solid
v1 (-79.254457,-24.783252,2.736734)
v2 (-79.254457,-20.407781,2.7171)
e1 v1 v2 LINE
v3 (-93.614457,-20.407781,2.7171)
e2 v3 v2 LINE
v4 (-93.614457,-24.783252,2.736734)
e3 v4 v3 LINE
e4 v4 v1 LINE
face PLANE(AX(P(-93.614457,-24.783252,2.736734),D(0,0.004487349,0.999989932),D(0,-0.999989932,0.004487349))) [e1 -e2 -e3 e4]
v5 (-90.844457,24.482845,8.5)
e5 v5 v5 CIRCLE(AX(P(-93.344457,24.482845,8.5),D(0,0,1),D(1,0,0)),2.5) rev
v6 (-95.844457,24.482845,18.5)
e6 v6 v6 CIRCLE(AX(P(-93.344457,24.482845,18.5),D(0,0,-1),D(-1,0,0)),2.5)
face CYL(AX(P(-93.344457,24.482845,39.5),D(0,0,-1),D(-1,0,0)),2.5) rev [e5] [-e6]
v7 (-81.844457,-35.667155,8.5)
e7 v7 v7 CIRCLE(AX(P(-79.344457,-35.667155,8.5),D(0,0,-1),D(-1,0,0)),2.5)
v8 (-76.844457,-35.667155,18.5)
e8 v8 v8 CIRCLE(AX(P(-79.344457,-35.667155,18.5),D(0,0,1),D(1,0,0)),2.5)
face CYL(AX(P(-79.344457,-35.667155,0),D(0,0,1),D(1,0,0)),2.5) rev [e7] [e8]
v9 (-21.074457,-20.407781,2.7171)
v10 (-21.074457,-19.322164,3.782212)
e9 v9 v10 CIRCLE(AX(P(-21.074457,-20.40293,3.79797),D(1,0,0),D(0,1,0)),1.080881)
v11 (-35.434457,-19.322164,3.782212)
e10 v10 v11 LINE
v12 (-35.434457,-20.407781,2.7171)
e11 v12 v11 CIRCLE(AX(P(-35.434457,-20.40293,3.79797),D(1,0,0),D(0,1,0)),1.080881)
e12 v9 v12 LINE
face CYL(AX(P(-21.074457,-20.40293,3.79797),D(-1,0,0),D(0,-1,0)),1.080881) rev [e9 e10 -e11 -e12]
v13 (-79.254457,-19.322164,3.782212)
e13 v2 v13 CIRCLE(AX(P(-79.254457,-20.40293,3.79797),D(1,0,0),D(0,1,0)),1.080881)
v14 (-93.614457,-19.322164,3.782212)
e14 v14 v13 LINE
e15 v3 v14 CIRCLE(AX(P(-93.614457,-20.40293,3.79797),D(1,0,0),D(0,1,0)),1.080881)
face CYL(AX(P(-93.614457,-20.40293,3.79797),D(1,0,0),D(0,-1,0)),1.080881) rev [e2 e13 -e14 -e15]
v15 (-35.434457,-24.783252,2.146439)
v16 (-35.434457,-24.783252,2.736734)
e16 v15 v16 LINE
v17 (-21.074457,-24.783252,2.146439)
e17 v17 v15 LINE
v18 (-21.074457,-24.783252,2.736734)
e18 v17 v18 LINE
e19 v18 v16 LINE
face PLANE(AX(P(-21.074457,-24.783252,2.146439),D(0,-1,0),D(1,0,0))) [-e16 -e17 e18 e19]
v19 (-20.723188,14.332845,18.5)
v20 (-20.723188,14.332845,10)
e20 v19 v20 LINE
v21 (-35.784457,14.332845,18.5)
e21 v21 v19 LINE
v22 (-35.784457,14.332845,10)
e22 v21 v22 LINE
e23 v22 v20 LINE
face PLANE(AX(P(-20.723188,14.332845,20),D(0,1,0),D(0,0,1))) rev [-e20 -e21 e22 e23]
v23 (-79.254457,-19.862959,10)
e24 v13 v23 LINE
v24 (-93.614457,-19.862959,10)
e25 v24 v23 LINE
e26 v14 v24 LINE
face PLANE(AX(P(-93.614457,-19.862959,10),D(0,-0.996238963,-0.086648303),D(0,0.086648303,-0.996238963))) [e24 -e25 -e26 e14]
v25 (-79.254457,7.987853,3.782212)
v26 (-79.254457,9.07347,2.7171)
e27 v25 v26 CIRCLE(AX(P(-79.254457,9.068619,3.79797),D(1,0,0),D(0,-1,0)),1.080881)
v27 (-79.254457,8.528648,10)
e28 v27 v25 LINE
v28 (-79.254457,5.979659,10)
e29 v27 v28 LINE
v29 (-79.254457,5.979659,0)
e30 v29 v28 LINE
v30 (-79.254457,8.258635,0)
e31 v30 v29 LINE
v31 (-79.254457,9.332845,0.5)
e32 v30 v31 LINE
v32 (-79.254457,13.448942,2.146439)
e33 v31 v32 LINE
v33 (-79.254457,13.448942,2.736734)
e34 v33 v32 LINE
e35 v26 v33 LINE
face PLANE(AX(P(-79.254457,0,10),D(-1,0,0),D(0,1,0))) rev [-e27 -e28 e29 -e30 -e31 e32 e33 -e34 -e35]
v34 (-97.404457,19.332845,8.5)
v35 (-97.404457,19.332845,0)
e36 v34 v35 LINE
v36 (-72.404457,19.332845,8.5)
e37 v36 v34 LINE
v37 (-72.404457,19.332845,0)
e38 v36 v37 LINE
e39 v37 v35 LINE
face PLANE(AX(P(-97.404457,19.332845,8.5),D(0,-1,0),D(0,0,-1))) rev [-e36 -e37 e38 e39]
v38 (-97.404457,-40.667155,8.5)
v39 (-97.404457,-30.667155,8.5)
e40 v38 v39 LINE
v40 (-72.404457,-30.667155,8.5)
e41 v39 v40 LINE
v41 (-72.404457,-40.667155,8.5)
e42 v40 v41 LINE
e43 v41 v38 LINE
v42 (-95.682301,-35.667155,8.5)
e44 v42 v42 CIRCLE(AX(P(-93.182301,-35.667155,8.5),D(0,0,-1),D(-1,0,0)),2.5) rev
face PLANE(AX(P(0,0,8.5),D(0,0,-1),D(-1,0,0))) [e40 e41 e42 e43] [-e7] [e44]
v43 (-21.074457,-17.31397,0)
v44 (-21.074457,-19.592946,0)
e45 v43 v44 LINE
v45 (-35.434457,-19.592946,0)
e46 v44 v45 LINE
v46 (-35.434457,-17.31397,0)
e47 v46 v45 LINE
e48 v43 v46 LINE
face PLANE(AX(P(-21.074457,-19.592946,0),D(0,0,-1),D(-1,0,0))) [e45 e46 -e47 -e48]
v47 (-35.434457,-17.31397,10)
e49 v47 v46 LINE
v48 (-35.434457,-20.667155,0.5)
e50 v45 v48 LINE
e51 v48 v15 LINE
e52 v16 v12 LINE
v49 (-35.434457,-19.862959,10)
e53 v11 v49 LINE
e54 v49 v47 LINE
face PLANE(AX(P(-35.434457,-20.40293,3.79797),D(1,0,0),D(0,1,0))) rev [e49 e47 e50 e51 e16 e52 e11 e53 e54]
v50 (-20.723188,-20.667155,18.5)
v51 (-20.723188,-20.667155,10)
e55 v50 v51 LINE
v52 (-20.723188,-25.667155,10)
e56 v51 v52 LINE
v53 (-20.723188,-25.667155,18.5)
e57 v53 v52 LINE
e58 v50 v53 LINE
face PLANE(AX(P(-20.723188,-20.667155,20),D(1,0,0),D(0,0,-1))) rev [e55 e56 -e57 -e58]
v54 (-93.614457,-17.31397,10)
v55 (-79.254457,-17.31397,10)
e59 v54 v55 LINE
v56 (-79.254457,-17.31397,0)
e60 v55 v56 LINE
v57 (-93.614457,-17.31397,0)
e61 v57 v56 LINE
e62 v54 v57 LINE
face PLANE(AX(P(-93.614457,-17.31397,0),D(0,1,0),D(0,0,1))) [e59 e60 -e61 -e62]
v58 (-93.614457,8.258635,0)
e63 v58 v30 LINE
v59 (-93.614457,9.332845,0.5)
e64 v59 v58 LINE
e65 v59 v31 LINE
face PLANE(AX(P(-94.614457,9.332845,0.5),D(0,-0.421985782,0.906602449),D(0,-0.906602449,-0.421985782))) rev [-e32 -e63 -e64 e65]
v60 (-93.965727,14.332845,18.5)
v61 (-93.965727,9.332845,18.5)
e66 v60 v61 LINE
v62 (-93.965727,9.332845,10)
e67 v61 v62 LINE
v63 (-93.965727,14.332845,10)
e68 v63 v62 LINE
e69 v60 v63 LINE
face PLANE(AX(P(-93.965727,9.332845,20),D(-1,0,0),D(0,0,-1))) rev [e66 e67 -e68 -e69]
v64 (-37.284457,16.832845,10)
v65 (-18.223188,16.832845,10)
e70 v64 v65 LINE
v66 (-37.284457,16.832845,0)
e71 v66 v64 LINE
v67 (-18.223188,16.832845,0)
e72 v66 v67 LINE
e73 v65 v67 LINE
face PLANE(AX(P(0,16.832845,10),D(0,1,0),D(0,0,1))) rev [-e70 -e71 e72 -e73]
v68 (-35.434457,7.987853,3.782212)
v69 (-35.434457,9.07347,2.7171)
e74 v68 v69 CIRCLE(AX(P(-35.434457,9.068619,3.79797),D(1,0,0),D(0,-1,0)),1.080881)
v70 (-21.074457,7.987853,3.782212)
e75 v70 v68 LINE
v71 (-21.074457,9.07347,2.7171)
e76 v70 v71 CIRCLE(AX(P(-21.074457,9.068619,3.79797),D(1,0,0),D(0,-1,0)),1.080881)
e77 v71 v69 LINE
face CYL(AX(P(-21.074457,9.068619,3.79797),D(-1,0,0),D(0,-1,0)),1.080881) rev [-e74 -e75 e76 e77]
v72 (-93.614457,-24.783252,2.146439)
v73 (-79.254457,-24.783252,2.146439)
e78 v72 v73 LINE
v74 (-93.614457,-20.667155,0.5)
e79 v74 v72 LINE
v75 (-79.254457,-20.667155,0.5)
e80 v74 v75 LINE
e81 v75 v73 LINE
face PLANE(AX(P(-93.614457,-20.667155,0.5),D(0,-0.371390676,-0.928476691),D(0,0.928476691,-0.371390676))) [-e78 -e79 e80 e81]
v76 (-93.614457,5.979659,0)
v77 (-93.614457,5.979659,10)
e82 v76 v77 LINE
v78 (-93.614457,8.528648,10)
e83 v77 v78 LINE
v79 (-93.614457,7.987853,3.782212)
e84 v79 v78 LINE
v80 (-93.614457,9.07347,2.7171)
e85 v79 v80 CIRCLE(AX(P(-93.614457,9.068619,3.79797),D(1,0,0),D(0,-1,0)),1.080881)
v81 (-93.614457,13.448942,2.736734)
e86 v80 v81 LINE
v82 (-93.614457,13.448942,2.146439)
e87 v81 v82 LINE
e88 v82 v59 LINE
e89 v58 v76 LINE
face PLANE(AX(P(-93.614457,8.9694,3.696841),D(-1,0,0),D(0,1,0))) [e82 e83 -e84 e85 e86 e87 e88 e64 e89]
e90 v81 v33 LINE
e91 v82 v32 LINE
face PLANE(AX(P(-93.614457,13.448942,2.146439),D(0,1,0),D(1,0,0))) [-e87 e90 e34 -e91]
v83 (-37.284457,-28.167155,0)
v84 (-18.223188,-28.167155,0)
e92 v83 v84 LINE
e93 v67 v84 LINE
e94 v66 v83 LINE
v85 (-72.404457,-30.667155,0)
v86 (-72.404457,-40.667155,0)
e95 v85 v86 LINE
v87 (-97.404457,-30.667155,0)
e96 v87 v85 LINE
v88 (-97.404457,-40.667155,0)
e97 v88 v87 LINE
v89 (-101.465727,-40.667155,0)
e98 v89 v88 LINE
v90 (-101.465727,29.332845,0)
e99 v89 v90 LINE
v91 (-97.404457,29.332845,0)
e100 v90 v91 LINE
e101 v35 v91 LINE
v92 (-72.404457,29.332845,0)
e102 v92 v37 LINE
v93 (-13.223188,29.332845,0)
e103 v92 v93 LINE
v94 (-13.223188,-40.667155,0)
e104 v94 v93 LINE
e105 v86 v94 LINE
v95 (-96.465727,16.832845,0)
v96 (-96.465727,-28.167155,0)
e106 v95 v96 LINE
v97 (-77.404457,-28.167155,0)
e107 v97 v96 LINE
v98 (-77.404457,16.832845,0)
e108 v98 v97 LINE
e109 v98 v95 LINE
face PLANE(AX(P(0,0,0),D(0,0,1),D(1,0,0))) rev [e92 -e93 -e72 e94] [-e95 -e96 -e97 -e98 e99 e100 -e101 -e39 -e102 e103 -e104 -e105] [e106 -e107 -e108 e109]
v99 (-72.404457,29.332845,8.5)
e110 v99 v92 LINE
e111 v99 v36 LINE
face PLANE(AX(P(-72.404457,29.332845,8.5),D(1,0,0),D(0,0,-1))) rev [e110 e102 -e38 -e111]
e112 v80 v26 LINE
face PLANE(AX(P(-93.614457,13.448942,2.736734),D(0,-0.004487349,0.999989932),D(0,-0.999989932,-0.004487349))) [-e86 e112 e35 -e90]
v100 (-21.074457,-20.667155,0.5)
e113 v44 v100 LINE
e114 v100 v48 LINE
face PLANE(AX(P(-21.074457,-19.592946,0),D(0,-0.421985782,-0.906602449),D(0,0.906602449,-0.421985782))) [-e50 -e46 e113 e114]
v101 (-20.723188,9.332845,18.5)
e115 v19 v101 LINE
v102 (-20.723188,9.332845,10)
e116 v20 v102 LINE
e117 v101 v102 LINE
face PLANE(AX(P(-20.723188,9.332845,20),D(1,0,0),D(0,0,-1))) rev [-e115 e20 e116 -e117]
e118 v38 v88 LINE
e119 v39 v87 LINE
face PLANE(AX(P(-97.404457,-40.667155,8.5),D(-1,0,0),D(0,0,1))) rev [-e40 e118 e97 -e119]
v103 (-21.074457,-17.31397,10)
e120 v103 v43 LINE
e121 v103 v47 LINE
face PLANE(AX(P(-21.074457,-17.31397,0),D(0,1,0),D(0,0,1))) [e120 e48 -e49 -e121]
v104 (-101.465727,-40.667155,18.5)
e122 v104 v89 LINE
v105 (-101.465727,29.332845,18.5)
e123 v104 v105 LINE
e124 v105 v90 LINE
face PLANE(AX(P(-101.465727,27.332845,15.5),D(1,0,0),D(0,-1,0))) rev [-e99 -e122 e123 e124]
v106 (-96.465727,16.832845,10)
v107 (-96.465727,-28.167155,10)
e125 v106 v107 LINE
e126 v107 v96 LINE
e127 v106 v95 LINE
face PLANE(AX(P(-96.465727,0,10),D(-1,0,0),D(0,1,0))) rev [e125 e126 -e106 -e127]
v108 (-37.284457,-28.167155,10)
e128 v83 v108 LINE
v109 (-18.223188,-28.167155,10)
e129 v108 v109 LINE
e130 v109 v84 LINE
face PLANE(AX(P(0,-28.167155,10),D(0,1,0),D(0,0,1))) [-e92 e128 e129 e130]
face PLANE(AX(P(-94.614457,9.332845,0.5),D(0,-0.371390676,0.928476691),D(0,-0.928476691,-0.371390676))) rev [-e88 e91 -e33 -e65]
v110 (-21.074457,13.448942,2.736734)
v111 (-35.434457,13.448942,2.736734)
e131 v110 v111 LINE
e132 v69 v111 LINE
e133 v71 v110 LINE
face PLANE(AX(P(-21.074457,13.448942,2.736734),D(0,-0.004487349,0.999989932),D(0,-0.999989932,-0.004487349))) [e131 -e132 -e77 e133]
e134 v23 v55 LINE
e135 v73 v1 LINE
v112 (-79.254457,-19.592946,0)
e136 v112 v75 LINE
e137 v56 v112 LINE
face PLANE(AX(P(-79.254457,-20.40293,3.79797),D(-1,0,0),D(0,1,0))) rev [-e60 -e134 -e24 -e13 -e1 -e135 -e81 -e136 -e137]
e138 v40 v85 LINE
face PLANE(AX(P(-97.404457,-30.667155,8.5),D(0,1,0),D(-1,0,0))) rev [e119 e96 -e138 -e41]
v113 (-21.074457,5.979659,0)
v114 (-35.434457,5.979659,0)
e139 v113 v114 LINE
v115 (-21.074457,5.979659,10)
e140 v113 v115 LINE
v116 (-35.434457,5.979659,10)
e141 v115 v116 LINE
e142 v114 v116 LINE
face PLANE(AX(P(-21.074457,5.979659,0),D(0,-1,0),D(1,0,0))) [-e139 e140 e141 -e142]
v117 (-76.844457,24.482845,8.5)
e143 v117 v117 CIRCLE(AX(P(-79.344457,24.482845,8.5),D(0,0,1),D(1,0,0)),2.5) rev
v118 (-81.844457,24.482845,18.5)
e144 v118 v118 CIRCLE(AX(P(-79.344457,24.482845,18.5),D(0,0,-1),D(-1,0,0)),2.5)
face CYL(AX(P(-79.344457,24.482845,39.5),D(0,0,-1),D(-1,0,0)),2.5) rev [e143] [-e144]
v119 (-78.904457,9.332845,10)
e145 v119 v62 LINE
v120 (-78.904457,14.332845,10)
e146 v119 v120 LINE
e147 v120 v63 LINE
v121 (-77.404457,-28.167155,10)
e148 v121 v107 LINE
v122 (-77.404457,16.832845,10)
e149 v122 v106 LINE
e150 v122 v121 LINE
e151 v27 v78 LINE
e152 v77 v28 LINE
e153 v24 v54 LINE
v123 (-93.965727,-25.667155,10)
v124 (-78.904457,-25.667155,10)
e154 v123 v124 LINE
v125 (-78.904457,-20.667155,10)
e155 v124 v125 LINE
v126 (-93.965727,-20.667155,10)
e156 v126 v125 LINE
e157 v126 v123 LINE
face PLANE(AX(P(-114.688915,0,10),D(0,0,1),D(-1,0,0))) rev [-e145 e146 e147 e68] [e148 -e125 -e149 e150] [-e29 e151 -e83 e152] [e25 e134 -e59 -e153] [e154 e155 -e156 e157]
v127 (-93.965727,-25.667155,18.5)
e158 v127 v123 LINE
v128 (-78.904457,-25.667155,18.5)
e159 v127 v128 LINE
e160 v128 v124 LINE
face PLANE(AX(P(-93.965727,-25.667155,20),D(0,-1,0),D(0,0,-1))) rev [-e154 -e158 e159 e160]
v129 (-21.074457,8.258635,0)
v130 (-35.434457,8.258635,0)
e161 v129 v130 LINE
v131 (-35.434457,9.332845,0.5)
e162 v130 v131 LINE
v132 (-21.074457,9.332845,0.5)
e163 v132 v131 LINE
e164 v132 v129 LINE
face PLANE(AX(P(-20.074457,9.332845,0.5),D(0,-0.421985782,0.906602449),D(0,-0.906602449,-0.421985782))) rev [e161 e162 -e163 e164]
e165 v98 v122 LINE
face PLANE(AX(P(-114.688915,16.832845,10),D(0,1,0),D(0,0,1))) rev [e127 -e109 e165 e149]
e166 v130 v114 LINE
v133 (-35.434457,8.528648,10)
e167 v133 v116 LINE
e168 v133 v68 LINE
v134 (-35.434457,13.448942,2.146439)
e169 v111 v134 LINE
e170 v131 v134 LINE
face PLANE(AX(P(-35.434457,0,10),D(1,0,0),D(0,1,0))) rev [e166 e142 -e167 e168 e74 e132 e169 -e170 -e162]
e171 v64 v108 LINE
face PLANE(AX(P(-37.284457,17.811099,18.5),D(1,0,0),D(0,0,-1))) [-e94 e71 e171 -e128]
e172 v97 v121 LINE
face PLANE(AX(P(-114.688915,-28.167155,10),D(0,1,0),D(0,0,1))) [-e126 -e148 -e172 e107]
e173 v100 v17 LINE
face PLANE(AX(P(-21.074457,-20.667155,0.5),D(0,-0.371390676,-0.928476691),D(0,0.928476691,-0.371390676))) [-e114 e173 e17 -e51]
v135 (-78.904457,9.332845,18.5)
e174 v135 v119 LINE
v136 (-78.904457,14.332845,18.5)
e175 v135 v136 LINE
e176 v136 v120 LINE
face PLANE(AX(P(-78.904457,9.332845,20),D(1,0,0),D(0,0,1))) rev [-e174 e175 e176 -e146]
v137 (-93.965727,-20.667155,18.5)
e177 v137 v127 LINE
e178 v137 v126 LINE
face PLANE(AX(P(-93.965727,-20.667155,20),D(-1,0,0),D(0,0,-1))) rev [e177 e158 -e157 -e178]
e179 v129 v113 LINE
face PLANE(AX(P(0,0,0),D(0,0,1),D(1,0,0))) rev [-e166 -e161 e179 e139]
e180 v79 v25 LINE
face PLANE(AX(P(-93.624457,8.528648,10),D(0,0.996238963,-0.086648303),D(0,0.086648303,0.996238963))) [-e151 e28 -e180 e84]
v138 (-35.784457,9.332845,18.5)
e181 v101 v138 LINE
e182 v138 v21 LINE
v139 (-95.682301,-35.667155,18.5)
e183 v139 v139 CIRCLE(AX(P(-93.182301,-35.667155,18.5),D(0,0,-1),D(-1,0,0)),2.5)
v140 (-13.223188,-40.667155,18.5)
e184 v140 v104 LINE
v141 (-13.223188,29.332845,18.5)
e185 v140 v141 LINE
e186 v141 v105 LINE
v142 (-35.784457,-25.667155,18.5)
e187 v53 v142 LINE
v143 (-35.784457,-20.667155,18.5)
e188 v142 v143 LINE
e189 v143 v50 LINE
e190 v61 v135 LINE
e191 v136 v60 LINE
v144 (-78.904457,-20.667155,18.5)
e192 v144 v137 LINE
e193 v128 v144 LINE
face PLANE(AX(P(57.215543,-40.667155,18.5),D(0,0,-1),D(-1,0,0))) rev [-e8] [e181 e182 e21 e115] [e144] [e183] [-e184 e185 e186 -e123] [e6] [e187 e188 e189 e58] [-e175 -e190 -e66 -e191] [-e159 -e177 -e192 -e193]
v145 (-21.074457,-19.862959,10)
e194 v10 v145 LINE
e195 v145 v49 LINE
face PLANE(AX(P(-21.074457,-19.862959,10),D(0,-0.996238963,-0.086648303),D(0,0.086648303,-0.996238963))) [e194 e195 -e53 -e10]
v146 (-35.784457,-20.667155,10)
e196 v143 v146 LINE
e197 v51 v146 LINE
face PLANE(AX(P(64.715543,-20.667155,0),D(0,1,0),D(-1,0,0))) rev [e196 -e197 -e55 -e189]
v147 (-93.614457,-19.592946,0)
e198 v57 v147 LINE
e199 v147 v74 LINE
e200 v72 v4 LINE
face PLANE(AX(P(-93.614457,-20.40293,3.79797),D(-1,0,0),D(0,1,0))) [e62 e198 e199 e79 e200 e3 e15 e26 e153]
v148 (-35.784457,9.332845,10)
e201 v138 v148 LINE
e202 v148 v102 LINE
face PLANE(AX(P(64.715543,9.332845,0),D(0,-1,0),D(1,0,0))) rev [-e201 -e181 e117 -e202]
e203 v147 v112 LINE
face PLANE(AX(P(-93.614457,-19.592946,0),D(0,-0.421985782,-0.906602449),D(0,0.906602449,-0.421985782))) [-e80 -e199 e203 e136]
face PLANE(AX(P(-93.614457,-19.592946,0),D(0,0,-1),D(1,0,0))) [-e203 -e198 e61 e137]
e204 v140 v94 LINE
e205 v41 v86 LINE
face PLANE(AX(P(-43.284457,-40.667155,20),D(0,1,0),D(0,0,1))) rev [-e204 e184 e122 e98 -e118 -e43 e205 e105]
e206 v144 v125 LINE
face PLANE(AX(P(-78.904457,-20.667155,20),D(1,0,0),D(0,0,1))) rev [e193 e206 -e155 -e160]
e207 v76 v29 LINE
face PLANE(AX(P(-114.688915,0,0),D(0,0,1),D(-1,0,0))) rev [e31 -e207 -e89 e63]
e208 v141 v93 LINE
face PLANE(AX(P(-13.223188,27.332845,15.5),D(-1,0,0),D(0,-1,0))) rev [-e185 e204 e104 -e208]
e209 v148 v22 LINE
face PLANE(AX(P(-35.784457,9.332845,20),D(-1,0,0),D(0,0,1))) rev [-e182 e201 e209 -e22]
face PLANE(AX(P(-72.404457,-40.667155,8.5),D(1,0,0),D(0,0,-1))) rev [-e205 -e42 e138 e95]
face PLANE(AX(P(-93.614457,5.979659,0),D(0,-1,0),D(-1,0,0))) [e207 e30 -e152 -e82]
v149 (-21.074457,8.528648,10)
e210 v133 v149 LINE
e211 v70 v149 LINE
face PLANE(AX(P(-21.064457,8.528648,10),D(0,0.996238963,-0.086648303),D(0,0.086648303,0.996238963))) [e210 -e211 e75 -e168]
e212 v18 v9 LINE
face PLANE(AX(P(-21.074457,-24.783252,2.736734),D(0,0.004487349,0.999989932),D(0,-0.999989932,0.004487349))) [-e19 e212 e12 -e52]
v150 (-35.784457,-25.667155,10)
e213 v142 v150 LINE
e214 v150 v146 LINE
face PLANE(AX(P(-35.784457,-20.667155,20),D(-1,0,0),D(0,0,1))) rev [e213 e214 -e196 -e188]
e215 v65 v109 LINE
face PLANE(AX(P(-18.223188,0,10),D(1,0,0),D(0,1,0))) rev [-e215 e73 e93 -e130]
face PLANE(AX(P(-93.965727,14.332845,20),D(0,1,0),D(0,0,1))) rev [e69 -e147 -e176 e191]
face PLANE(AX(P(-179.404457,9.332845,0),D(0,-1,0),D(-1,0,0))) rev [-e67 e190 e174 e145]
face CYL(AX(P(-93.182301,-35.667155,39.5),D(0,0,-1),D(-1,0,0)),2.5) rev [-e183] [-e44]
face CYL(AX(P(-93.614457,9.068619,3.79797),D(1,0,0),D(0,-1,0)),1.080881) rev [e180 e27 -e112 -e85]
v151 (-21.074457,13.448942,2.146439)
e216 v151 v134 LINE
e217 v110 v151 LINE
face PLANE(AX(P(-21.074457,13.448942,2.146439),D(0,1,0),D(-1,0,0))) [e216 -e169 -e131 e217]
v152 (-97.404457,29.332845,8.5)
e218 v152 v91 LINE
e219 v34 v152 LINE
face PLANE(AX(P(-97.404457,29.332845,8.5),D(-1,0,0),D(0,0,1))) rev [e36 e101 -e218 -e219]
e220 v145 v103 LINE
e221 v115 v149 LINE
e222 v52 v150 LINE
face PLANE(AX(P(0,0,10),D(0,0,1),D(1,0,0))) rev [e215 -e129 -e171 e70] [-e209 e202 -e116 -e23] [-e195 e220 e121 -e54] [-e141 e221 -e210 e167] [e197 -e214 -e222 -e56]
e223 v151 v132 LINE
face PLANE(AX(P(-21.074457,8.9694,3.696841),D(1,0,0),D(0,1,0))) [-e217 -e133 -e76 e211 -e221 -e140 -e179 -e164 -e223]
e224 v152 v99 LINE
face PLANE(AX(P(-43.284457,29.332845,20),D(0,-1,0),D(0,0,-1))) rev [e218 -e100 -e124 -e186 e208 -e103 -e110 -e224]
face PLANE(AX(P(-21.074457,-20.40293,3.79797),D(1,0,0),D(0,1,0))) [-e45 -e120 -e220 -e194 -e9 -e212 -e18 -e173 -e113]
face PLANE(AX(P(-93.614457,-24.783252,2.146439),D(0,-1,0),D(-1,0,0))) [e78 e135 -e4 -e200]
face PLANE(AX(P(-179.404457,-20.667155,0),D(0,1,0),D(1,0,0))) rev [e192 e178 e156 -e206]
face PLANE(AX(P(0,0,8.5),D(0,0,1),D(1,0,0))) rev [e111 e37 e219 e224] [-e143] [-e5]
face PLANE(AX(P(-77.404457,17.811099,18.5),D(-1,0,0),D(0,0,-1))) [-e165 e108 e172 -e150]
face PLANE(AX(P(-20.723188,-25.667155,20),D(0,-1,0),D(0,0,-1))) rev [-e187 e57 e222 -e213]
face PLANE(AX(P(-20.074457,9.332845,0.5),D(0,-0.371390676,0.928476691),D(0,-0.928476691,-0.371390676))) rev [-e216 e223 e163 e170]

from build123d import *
from build123d.topology import SkipClean

# Parameters (mm, degrees)
SKETCH1_W                = 90
SKETCH1_H                = 70
SKETCH1_W_2              = 20.06126988
SKETCH1_H_2              = 45
SKETCH1_W_3              = 19.93873012
BOSS_EXTRUDE2_DEPTH      = 10
SKETCH1_W_4              = 15.06126988
SKETCH1_H_3              = 40
BOSS_EXTRUDE2_2_DEPTH    = 10
SKETCH1_W_5              = 14.93873012
BOSS_EXTRUDE2_3_DEPTH    = 10
SKETCH2_W                = 90
SKETCH2_H                = 70
BOSS_EXTRUDE3_DEPTH      = 10
SKETCH4_W                = 1.5
SKETCH4_H                = 70
CUT_EXTRUDE2_DEPTH       = 100.5
SKETCH10_W               = 5
SKETCH10_H               = 70
CUT_EXTRUDE4_DEPTH       = 100.5
SKETCH11_W               = 6.5
SKETCH11_H               = 5
CUT_EXTRUDE5_DEPTH       = 100.5
SKETCH12_W               = 18.5
SKETCH12_H               = 70
BOSS_EXTRUDE5_DEPTH      = 5
SKETCH13_W               = 18.5
SKETCH13_H               = 70
BOSS_EXTRUDE6_DEPTH      = 5
SKETCH14_W               = 40
SKETCH14_H               = 45
BOSS_EXTRUDE7_DEPTH      = 11
SKETCH15_R               = 2.5
CUT_EXTRUDE6_DEPTH       = 3
SKETCH16_W               = 30
SKETCH16_H               = 66
CUT_EXTRUDE8_DEPTH       = 15.5
SKETCH17_W               = 14.93873012
SKETCH17_H               = 15
SKETCH17_W_2             = 15.06126988
CUT_EXTRUDE10_DEPTH      = 10
SKETCH18_W               = 14.93873012
SKETCH18_H               = 5
SKETCH18_W_2             = 15.06126988
CUT_EXTRUDE11_DEPTH      = 10
CUT_EXTRUDE12_DEPTH      = 10
SKETCH23_W               = 14.93873012
SKETCH23_H               = 40
SKETCH23_W_2             = 5.3
SKETCH23_H_2             = 39
SKETCH23_W_3             = 2.93873012
SKETCH23_W_4             = 3.06126988
CUT_EXTRUDE14_DEPTH      = 10
SKETCH28_W               = 18.5
SKETCH28_H               = 44.033892013
CUT_EXTRUDE15_DEPTH      = 6
CUT_EXTRUDE16_DEPTH      = 75
SKETCH30_W               = 18.5
SKETCH30_H               = 44.033892013
BOSS_EXTRUDE9_DEPTH      = 6
SKETCH31_W               = 1
SKETCH31_H               = 1.413045359
BOSS_EXTRUDE10_DEPTH     = 11
SKETCH32_W               = 8.246560308
SKETCH32_H               = 43.371701703
BOSS_EXTRUDE11_DEPTH     = 5
SKETCH33_W               = 8.811569605
SKETCH33_H               = 37.919451222
BOSS_EXTRUDE12_DEPTH     = 5
SKETCH34_W               = 59.93873012
SKETCH34_H               = 70
CUT_EXTRUDE18_DEPTH      = 37
SKETCH35_W               = 14.36126988
SKETCH35_H               = 2
CUT_EXTRUDE20_DEPTH      = 7
SKETCH36_W               = 5.3
SKETCH36_H               = 2
CUT_EXTRUDE21_DEPTH      = 10
SKETCH37_W               = 14.36126988
SKETCH37_H               = 1.5
CUT_EXTRUDE22_DEPTH      = 10
SKETCH38_W               = 1.5
SKETCH38_H               = 4
CUT_EXTRUDE23_DEPTH      = 15
CUT_EXTRUDE24_DEPTH      = 10
CUT_EXTRUDE24_DEPTH_BACK = 6
SKETCH39_W               = 1.5
SKETCH39_H               = 2
CUT_EXTRUDE26_DEPTH      = 10
CUT_EXTRUDE26_DEPTH_BACK = 6
SKETCH41_W               = 16.397713906
SKETCH41_H               = 51.423830598
CUT_EXTRUDE27_DEPTH      = 5
BOSS_EXTRUDE13_DEPTH     = 14.37
FILLET4_R                = 1
BOSS_EXTRUDE14_DEPTH     = 14.37
FILLET5_R                = 1
CUT_EXTRUDE28_DEPTH      = 14.37
SKETCH45_W               = 14.36126988
SKETCH45_H               = 1
CUT_EXTRUDE29_DEPTH      = 14.37
SKETCH46_W               = 5
SKETCH46_H               = 51.423830598
BOSS_EXTRUDE15_DEPTH     = 18.37
SKETCH48_W               = 15.404975863
SKETCH48_H               = 48.247068862
CUT_EXTRUDE30_DEPTH      = 6
BOSS_EXTRUDE19_DEPTH     = 14.36
CUT_EXTRUDE33_DEPTH      = 15.36
CUT_EXTRUDE34_DEPTH      = 15.36
SKETCH56_W               = 3.76126988
SKETCH56_H               = 3.574209709
CUT_EXTRUDE35_DEPTH      = 5.36
BOSS_EXTRUDE23_DEPTH     = 14.36
CUT_EXTRUDE39_DEPTH      = 14.36
SKETCH61_W               = 0.148623377
SKETCH61_H               = 7.599329431
CUT_EXTRUDE41_DEPTH      = 10
CUT_EXTRUDE42_DEPTH      = 16
BOSS_EXTRUDE24_DEPTH     = 14.36
SKETCH68_W               = 15.06
SKETCH68_H               = 70
BOSS_EXTRUDE28_DEPTH     = 18.5
SKETCH70_W               = 6
SKETCH70_H               = 48.247068862
BOSS_EXTRUDE29_DEPTH     = 18.5
SKETCH72_W               = 16.06
SKETCH72_H               = 66
CUT_EXTRUDE44_DEPTH      = 16.5
SKETCH75_W               = 1
SKETCH75_H               = 70
CUT_EXTRUDE45_DEPTH      = 33.5
SKETCH76_R               = 2.5
CUT_EXTRUDE46_DEPTH      = 33.5
CUT_EXTRUDE48_DEPTH      = 26
CUT_EXTRUDE48_DEPTH_BACK = 23
SKETCH77_R               = 2.5
SKETCH78_W               = 22.535153564
SKETCH78_H               = 70
BOSS_EXTRUDE30_DEPTH     = 2
SKETCH79_W               = 35.12
SKETCH79_H               = 45
BOSS_EXTRUDE31_DEPTH     = 16.5
SKETCH80_W               = 6
SKETCH80_H               = 45
CUT_EXTRUDE49_DEPTH      = 16.5
SKETCH81_W               = 30.12
SKETCH81_H               = 66
BOSS_EXTRUDE33_DEPTH     = 16.5
SKETCH83_W               = 25
SKETCH83_H               = 10
CUT_EXTRUDE50_DEPTH      = 8.5
SKETCH84_R               = 2.5
CUT_EXTRUDE51_DEPTH      = 18.5


with BuildPart() as part:
    # Sketch1 → Boss-Extrude2 (new body)
    with BuildSketch(Plane.XY):
        with Locations((1.715542522, -5.667155425)):
            Rectangle(SKETCH1_W, SKETCH1_H)
        with Locations((-28.253822538, -5.667155425)):
            Rectangle(SKETCH1_W_2, SKETCH1_H_2, mode=Mode.SUBTRACT)
        with Locations((31.746177462, -5.667155425)):
            Rectangle(SKETCH1_W_3, SKETCH1_H_2, mode=Mode.SUBTRACT)
    extrude(amount=BOSS_EXTRUDE2_DEPTH)



with BuildPart() as body_2:
    # Sketch1 → Boss-Extrude2 2 (new body)
    with BuildSketch(Plane.XY):
        with Locations((-28.253822538, -5.667155425)):
            Rectangle(SKETCH1_W_4, SKETCH1_H_3)
    extrude(amount=BOSS_EXTRUDE2_2_DEPTH)


with BuildPart() as body_3:
    # Sketch1 → Boss-Extrude2 3 (new body)
    with BuildSketch(Plane.XY):
        with Locations((31.746177462, -5.667155425)):
            Rectangle(SKETCH1_W_5, SKETCH1_H_3)
    extrude(amount=BOSS_EXTRUDE2_3_DEPTH)


with BuildPart() as part_1:
    add(part.part)

    add(body_2.part)  # Boss-Extrude3 merges body 2

    add(body_3.part)  # Boss-Extrude3 merges body 3
    # Sketch2 → Boss-Extrude3 (add)
    with BuildSketch(Plane.XY.offset(10)):
        with Locations((1.715542522, -5.667155425)):
            Rectangle(SKETCH2_W, SKETCH2_H)
    extrude(amount=BOSS_EXTRUDE3_DEPTH)

    # Sketch4 → Cut-Extrude2 (cut)
    with BuildSketch(Plane.ZY.offset(43.284457478)):
        with Locations((19.25, -5.667155425)):
            Rectangle(SKETCH4_W, SKETCH4_H)
    extrude(amount=-CUT_EXTRUDE2_DEPTH, mode=Mode.SUBTRACT)

    # Sketch10 → Cut-Extrude4 (cut)
    with BuildSketch(Plane(origin=(0, 0, 0), x_dir=(-1, 0, 0), z_dir=(0, 0, -1))):
        with Locations((40.784457478, -5.667155425)):
            Rectangle(SKETCH10_W, SKETCH10_H)
        with Locations((-44.215542522, -5.667155425)):
            Rectangle(SKETCH10_W, SKETCH10_H)
    extrude(amount=-CUT_EXTRUDE4_DEPTH, mode=Mode.SUBTRACT)

    # Sketch11 → Cut-Extrude5 (cut)
    with BuildSketch(Plane.ZY.offset(35.784457478)):
        with Locations((6.75, 11.832844575)):
            Rectangle(SKETCH11_W, SKETCH11_H)
        Polygon((0, 9.332844575), (2, 14.332844575), (0, 14.332844575), align=None)
        Polygon((2, -25.667155425), (0, -20.667155425), (0, -25.667155425), align=None)
        with Locations((6.75, -23.167155425)):
            Rectangle(SKETCH11_W, SKETCH11_H)
    extrude(amount=-CUT_EXTRUDE5_DEPTH, mode=Mode.SUBTRACT)

    # Sketch12 → Boss-Extrude5 (add)
    with BuildSketch(Plane(origin=(41.715542522, 0, 0), x_dir=(0, 0, -1), z_dir=(1, 0, 0))):
        with Locations((-9.25, -5.667155425)):
            Rectangle(SKETCH12_W, SKETCH12_H)
    extrude(amount=BOSS_EXTRUDE5_DEPTH)

    # Sketch13 → Boss-Extrude6 (add)
    with BuildSketch(Plane.ZY.offset(38.284457478)):
        with Locations((9.25, -5.667155425)):
            Rectangle(SKETCH13_W, SKETCH13_H)
    extrude(amount=BOSS_EXTRUDE6_DEPTH)

    # Sketch14 → Boss-Extrude7 (add)
    with BuildSketch(Plane(origin=(0, 0, 0), x_dir=(-1, 0, 0), z_dir=(0, 0, -1))):
        with Locations((-1.776812402, -5.667155425)):
            Rectangle(SKETCH14_W, SKETCH14_H)
    extrude(amount=-BOSS_EXTRUDE7_DEPTH)

    # Sketch15 → Cut-Extrude6 (cut)
    with BuildSketch(Plane.XY.offset(18.5)):
        with Locations((8.715542522, 24.482844575)):
            Circle(SKETCH15_R)
        with Locations((-5.284457478, 24.482844575)):
            Circle(SKETCH15_R)
        with Locations((1.715542522, -35.667155425)):
            Circle(SKETCH15_R)
    extrude(amount=-CUT_EXTRUDE6_DEPTH, mode=Mode.SUBTRACT)

    # Sketch16 → Cut-Extrude8 (cut)
    with BuildSketch(Plane(origin=(0, 0, 0), x_dir=(-1, 0, 0), z_dir=(0, 0, -1))):
        with Locations((-1.776812402, -5.667155425)):
            Rectangle(SKETCH16_W, SKETCH16_H)
    extrude(amount=-CUT_EXTRUDE8_DEPTH, mode=Mode.SUBTRACT)

    # Sketch17 → Cut-Extrude10 (cut)
    with BuildSketch(Plane(origin=(0, 0, 0), x_dir=(-1, 0, 0), z_dir=(0, 0, -1))):
        with Locations((-31.746177462, -5.667155425)):
            Rectangle(SKETCH17_W, SKETCH17_H)
        with Locations((28.253822538, -5.667155425)):
            Rectangle(SKETCH17_W_2, SKETCH17_H)
    extrude(amount=-CUT_EXTRUDE10_DEPTH, mode=Mode.SUBTRACT)

    # Sketch18 → Cut-Extrude11 (cut)
    with BuildSketch(Plane(origin=(0, 0, 10), x_dir=(-1, 0, 0), z_dir=(0, 0, -1))):
        with Locations((-31.746177462, 11.832844575)):
            Rectangle(SKETCH18_W, SKETCH18_H)
        with Locations((-31.746177462, -23.167155425)):
            Rectangle(SKETCH18_W, SKETCH18_H)
        with Locations((28.253822538, -23.167155425)):
            Rectangle(SKETCH18_W_2, SKETCH18_H)
        with Locations((28.253822538, 11.832844575)):
            Rectangle(SKETCH18_W_2, SKETCH18_H)
    extrude(amount=-CUT_EXTRUDE11_DEPTH, mode=Mode.SUBTRACT)

    # Sketch19 → Cut-Extrude12 (cut)
    with BuildSketch(Plane(origin=(0, 0, 0), x_dir=(-1, 0, 0), z_dir=(0, 0, -1))):
        Polygon((-30.276812402, 14.332844575), (-33.215542522, 14.332844575), (-33.215542522, 4.832844575), (-39.215542522, 4.832844575), (-39.215542522, 1.832844575), (-24.276812402, 1.832844575), (-24.276812402, 4.832844575), (-30.276812402, 4.832844575), align=None)
        Polygon((20.723187598, 4.832844575), (20.723187598, 1.832844575), (35.784457478, 1.832844575), (35.784457478, 4.832844575), (29.784457478, 4.832844575), (29.784457478, 14.332844575), (26.723187598, 14.332844575), (26.723187598, 4.832844575), align=None)
        Polygon((20.723187598, -13.167155425), (20.723187598, -16.167155425), (26.723187598, -16.167155425), (26.723187598, -25.667155425), (29.784457478, -25.667155425), (29.784457478, -16.167155425), (35.784457478, -16.167155425), (35.784457478, -13.167155425), align=None)
        Polygon((-39.215542522, -13.167155425), (-39.215542522, -16.167155425), (-33.215542522, -16.167155425), (-33.215542522, -25.667155425), (-30.276812402, -25.667155425), (-30.276812402, -16.167155425), (-24.276812402, -16.167155425), (-24.276812402, -13.167155425), align=None)
    extrude(amount=-CUT_EXTRUDE12_DEPTH, mode=Mode.SUBTRACT)

    # Sketch23 → Cut-Extrude14 (cut)
    # profile 1 of 2: a face of its own
    with BuildSketch(Plane(origin=(0, 0, 0), x_dir=(-1, 0, 0), z_dir=(0, 0, -1))):
        with Locations((-31.746177462, -5.667155425)):
            Rectangle(SKETCH23_W, SKETCH23_H)
        with Locations((-36.215542522, -5.667155425)):
            Rectangle(SKETCH23_W_2, SKETCH23_H_2, mode=Mode.SUBTRACT)
        with Locations((-31.746177462, -5.667155425)):
            Rectangle(SKETCH23_W_3, SKETCH23_H_2, mode=Mode.SUBTRACT)
        with Locations((-27.276812402, -5.667155425)):
            Rectangle(SKETCH23_W_2, SKETCH23_H_2, mode=Mode.SUBTRACT)
    # profile 2 of 2: a face of its own
    with BuildSketch(Plane(origin=(0, 0, 0), x_dir=(-1, 0, 0), z_dir=(0, 0, -1))):
        Polygon((20.723187598, 13.832844575), (20.723187598, -25.667155425), (35.784457478, -25.667155425), (35.784457478, 14.332844575), (20.723187598, 14.332844575), align=None)
        with Locations((23.723187598, -5.667155425)):
            Rectangle(SKETCH23_W_2, SKETCH23_H_2, mode=Mode.SUBTRACT)
        with Locations((28.253822538, -5.667155425)):
            Rectangle(SKETCH23_W_4, SKETCH23_H_2, mode=Mode.SUBTRACT)
        with Locations((32.784457478, -5.667155425)):
            Rectangle(SKETCH23_W_2, SKETCH23_H_2, mode=Mode.SUBTRACT)
    extrude(amount=-CUT_EXTRUDE14_DEPTH, mode=Mode.SUBTRACT)

    # Sketch28 → Cut-Extrude15 (cut)
    with BuildSketch(Plane(origin=(46.715542522, 0, 0), x_dir=(0, 0, -1), z_dir=(1, 0, 0))):
        with Locations((-9.25, -5.184101432)):
            Rectangle(SKETCH28_W, SKETCH28_H)
    extrude(amount=-CUT_EXTRUDE15_DEPTH, mode=Mode.SUBTRACT)

    # Sketch29 → Cut-Extrude16 (cut)
    with BuildSketch(Plane(origin=(38.865542522, 0, 0), x_dir=(0, 0, -1), z_dir=(1, 0, 0))):
        Polygon((-3.5, 9.332844575), (-3.5, 7.724451309), (-5, 7.536386318), (-10, 8.528647942), (-10, 9.332844575), align=None)
        Polygon((-10, -19.862958792), (-10, -20.667155425), (-3.5, -20.667155425), (-3.5, -19.058762159), (-5, -18.870697169), align=None)
    extrude(amount=-CUT_EXTRUDE16_DEPTH, mode=Mode.SUBTRACT)

    # Sketch30 → Boss-Extrude9 (add)
    with BuildSketch(Plane(origin=(46.715542522, 0, 0), x_dir=(0, 0, -1), z_dir=(1, 0, 0))):
        with Locations((-9.25, -5.184101432)):
            Rectangle(SKETCH30_W, SKETCH30_H)
    extrude(amount=-BOSS_EXTRUDE9_DEPTH)

    # Sketch31 → Boss-Extrude10 (add)
    with BuildSketch(Plane(origin=(0, 0, 0), x_dir=(-1, 0, 0), z_dir=(0, 0, -1))):
        with Locations((-41.215542522, -27.907570118)):
            Rectangle(SKETCH31_W, SKETCH31_H)
    extrude(amount=-BOSS_EXTRUDE10_DEPTH)

    # Sketch32 → Boss-Extrude11 (add)
    with BuildSketch(Plane(origin=(21.776812402, 0, 0), x_dir=(0, 0, -1), z_dir=(1, 0, 0))):
        with Locations((-5.876719846, -6.481304574)):
            Rectangle(SKETCH32_W, SKETCH32_H)
    extrude(amount=-BOSS_EXTRUDE11_DEPTH)

    # Sketch33 → Boss-Extrude12 (add)
    with BuildSketch(Plane(origin=(-13.223187598, 0, 0), x_dir=(0, 0, -1), z_dir=(1, 0, 0))):
        with Locations((-7.016962477, -6.558213026)):
            Rectangle(SKETCH33_W, SKETCH33_H)
    extrude(amount=-BOSS_EXTRUDE12_DEPTH)

    # Sketch34 → Cut-Extrude18 (cut)
    with BuildSketch(Plane(origin=(0, 0, 0), x_dir=(-1, 0, 0), z_dir=(0, 0, -1))):
        with Locations((-16.746177462, -5.667155425)):
            Rectangle(SKETCH34_W, SKETCH34_H)
    extrude(amount=-CUT_EXTRUDE18_DEPTH, mode=Mode.SUBTRACT)

    # Sketch35 → Cut-Extrude20 (cut)
    with BuildSketch(Plane(origin=(0, 0, 0), x_dir=(-1, 0, 0), z_dir=(0, 0, -1))):
        with Locations((28.253822538, 12.832844575)):
            Rectangle(SKETCH35_W, SKETCH35_H)
    extrude(amount=-CUT_EXTRUDE20_DEPTH, mode=Mode.SUBTRACT)

    # Sketch36 → Cut-Extrude21 (cut)
    with BuildSketch(Plane(origin=(0, 0, 0), x_dir=(-1, 0, 0), z_dir=(0, 0, -1))):
        with Locations((23.723187598, 5.832844575)):
            Rectangle(SKETCH36_W, SKETCH36_H)
        with Locations((32.784457478, 5.832844575)):
            Rectangle(SKETCH36_W, SKETCH36_H)
    extrude(amount=-CUT_EXTRUDE21_DEPTH, mode=Mode.SUBTRACT)

    # Sketch37 → Cut-Extrude22 (cut)
    with BuildSketch(Plane(origin=(0, 0, 0), x_dir=(-1, 0, 0), z_dir=(0, 0, -1))):
        with Locations((28.253822538, -16.917155425)):
            Rectangle(SKETCH37_W, SKETCH37_H)
    extrude(amount=-CUT_EXTRUDE22_DEPTH, mode=Mode.SUBTRACT)

    # Sketch38 → Cut-Extrude23 (cut)
    with BuildSketch(Plane(origin=(-21.073187598, 0, 0), x_dir=(0, 0, -1), z_dir=(1, 0, 0))):
        with Locations((-2.75, 9.832844575)):
            Rectangle(SKETCH38_W, SKETCH38_H)
    extrude(amount=-CUT_EXTRUDE23_DEPTH, mode=Mode.SUBTRACT)

    # Sketch39 → Cut-Extrude24 (cut, two sides: drawn at the far end of the back side and taken through both)
    with BuildSketch(Plane(origin=(-30.134457478, 0, 0), x_dir=(0, 0, -1), z_dir=(1, 0, 0)).offset(-CUT_EXTRUDE24_DEPTH_BACK)):
        with Locations((-2.75, -20.058762159)):
            Rectangle(SKETCH39_W, SKETCH39_H)
    extrude(amount=CUT_EXTRUDE24_DEPTH + CUT_EXTRUDE24_DEPTH_BACK, mode=Mode.SUBTRACT)

    # Sketch40 → Cut-Extrude26 (cut, two sides: drawn at the far end of the back side and taken through both)
    with BuildSketch(Plane.ZY.offset(26.373187598).offset(-CUT_EXTRUDE26_DEPTH_BACK)):
        Polygon((2, -21.058762159), (3.5, -22.496291026), (3.5, -21.058762159), align=None)
    extrude(amount=CUT_EXTRUDE26_DEPTH + CUT_EXTRUDE26_DEPTH_BACK, mode=Mode.SUBTRACT)

    # Sketch41 → Cut-Extrude27 (cut)
    with BuildSketch(Plane.ZY.offset(43.284457478)):
        with Locations((8.198856953, -6.213161349)):
            Rectangle(SKETCH41_W, SKETCH41_H)
    extrude(amount=-CUT_EXTRUDE27_DEPTH, mode=Mode.SUBTRACT)

    # Sketch42 → Boss-Extrude13 (add)
    with BuildSketch(Plane.ZY.offset(35.434457478)):
        Polygon((10, 8.528647942), (2, 7.832844575), (2, 6.832844575), (10, 6.832844575), align=None)
    extrude(amount=-BOSS_EXTRUDE13_DEPTH)

    # Fillet4
    fillet4_edges = [part_1.edges().sort_by_distance(p)[0] for p in [
        (-23.723187598, 7.832844575, 2),
        (-32.784457478, 7.832844575, 2),
    ]]
    fillet(fillet4_edges, radius=FILLET4_R)

    # Sketch43 → Boss-Extrude14 (add)
    with BuildSketch(Plane.ZY.offset(35.434457478)):
        Polygon((10, -17.667155425), (10, -19.862958792), (2, -19.058762159), (2, -17.667155425), align=None)
    extrude(amount=-BOSS_EXTRUDE14_DEPTH)

    # Fillet5
    fillet5_edges = [part_1.edges().sort_by_distance(p)[0] for p in [
        (-23.723187598, -19.058762159, 2),
        (-32.784457478, -19.058762159, 2),
    ]]
    fillet(fillet5_edges, radius=FILLET5_R)

    # Sketch44 → Cut-Extrude28 (cut)
    with BuildSketch(Plane.ZY.offset(35.434457478)):
        Polygon((3.5, -25.167155425), (2.65, -25.167155425), (2.75, -21.777526593), (3.5, -22.496291026), align=None)
    extrude(amount=-CUT_EXTRUDE28_DEPTH, mode=Mode.SUBTRACT)

    # Sketch45 → Cut-Extrude29 (cut)
    with BuildSketch(Plane(origin=(0, 0, 0), x_dir=(-1, 0, 0), z_dir=(0, 0, -1))):
        with Locations((28.253822538, -24.667155425)):
            Rectangle(SKETCH45_W, SKETCH45_H)
    extrude(amount=-CUT_EXTRUDE29_DEPTH, mode=Mode.SUBTRACT)

    # Sketch46 → Boss-Extrude15 (add)
    with BuildSketch(Plane(origin=(0, 0, 0), x_dir=(-1, 0, 0), z_dir=(0, 0, -1))):
        with Locations((40.784457478, -6.213161349)):
            Rectangle(SKETCH46_W, SKETCH46_H)
    extrude(amount=-BOSS_EXTRUDE15_DEPTH)

    # Sketch48 → Cut-Extrude30 (cut)
    with BuildSketch(Plane.ZY.offset(43.284457478)):
        with Locations((7.702487932, -6.312435153)):
            Rectangle(SKETCH48_W, SKETCH48_H)
    extrude(amount=-CUT_EXTRUDE30_DEPTH, mode=Mode.SUBTRACT)

    # Sketch52 → Boss-Extrude19 (add)
    with BuildSketch(Plane.ZY.offset(35.434457478)):
        with BuildLine():
            Line((10, 8.528647942), (3.782211541, 7.987853174))
            ThreePointArc((3.782211541, 7.987853174), (2.993551961, 8.279394923), (2.717099882, 9.073469714))
            Line((2.717099882, 9.073469714), (2.717099882, 11.832427917))
            Line((2.717099882, 11.832427917), (1.5, 11.832844575))
            Line((1.5, 11.832844575), (0, 8.279394923))
            Line((0, 8.279394923), (0, 5.979658876))
            Line((0, 5.979658876), (10, 5.979658876))
            Line((10, 5.979658876), (10, 8.528647942))
        make_face()
    extrude(amount=-BOSS_EXTRUDE19_DEPTH)

    # Sketch53 → Cut-Extrude33 (cut)
    with BuildSketch(Plane.ZY.offset(35.434457478)):
        Polygon((0, 9.332844575), (0.5, 9.332844575), (1.5, 11.832844575), (1, 11.832844575), align=None)
    extrude(amount=-CUT_EXTRUDE33_DEPTH, mode=Mode.SUBTRACT)

    # Sketch55 → Cut-Extrude34 (cut)
    with BuildSketch(Plane.ZY.offset(35.434457478)):
        Polygon((0.5, 9.332844575), (0, 8.258634866), (0, 9.332844575), align=None)
    extrude(amount=-CUT_EXTRUDE34_DEPTH, mode=Mode.SUBTRACT)

    # Sketch56 → Cut-Extrude35 (cut)
    with BuildSketch(Plane(origin=(0, 0, 0), x_dir=(-1, 0, 0), z_dir=(0, 0, -1))):
        with Locations((28.253822538, 10.045739721)):
            Rectangle(SKETCH56_W, SKETCH56_H)
    extrude(amount=-CUT_EXTRUDE35_DEPTH, mode=Mode.SUBTRACT)

    # Sketch58 → Boss-Extrude23 (add)
    with BuildSketch(Plane.ZY.offset(35.434457478)):
        Polygon((1.5, 11.832844575), (2.146438787, 13.448941543), (2.736734348, 13.448941543), (2.717099882, 11.832427917), align=None)
    extrude(amount=-BOSS_EXTRUDE23_DEPTH)

    # Sketch59 → Cut-Extrude39 (cut)
    with BuildSketch(Plane(origin=(0, 0, 0), x_dir=(-1, 0, 0), z_dir=(0, 0, -1))):
        Polygon((26.373187598, 13.448941543), (26.373187598, 11.832844575), (26.373187598, 11.431091881), (30.134457478, 11.431091881), (30.134457478, 11.832844575), (30.134457478, 13.448941543), (30.134457478, 13.829263242), (26.373187598, 13.829263242), align=None)
    extrude(amount=-CUT_EXTRUDE39_DEPTH, mode=Mode.SUBTRACT)

    # Sketch61 → Cut-Extrude41 (cut)
    with BuildSketch(Plane(origin=(0, 0, 0), x_dir=(-1, 0, 0), z_dir=(0, 0, -1))):
        with Locations((21.00014579, 9.779323592)):
            Rectangle(SKETCH61_W, SKETCH61_H)
    extrude(amount=-CUT_EXTRUDE41_DEPTH, mode=Mode.SUBTRACT)

    # Sketch62 → Cut-Extrude42 (cut)
    with BuildSketch(Plane.ZY.offset(35.434457478)):
        Polygon((10, -17.667155425), (0, -17.667155425), (0, -20.667155425), (1.4, -24.167155425), (2.679501755, -24.167155425), (2.75, -21.777526593), (10, -19.862958792), align=None)
    extrude(amount=-CUT_EXTRUDE42_DEPTH, mode=Mode.SUBTRACT)

    # Sketch65 → Boss-Extrude24 (add)
    with BuildSketch(Plane.ZY.offset(35.434457478)):
        with BuildLine():
            Line((0, 8.258634866), (0, 5.979658876))
            Line((0, 5.979658876), (10, 5.979658876))
            Line((10, 5.979658876), (10, 8.528647942))
            Line((10, 8.528647942), (3.782211541, 7.987853174))
            ThreePointArc((3.782211541, 7.987853174), (3.026420054, 8.311642211), (2.717099882, 9.073469714))
            Line((2.717099882, 9.073469714), (2.736734348, 13.448941543))
            Line((2.736734348, 13.448941543), (2.146438787, 13.448941543))
            Line((2.146438787, 13.448941543), (0.5, 9.332844575))
            Line((0.5, 9.332844575), (0, 8.258634866))
        make_face()
        with BuildLine():
            Line((10, -17.313969726), (10, -19.862958792))
            Line((10, -19.862958792), (3.782211541, -19.322164024))
            ThreePointArc((3.782211541, -19.322164024), (3.026420054, -19.645953062), (2.717099882, -20.407780564))
            Line((2.717099882, -20.407780564), (2.736734348, -24.783252393))
            Line((2.736734348, -24.783252393), (2.146438787, -24.783252393))
            Line((2.146438787, -24.783252393), (0.5, -20.667155425))
            Line((0.5, -20.667155425), (0, -19.592945716))
            Line((0, -19.592945716), (0, -17.313969726))
            Line((0, -17.313969726), (10, -17.313969726))
        make_face()
    extrude(amount=-BOSS_EXTRUDE24_DEPTH)

    # Sketch68 → Boss-Extrude28 (add)
    with BuildSketch(Plane(origin=(0, 0, 0), x_dir=(-1, 0, 0), z_dir=(0, 0, -1))):
        with Locations((50.814457478, -5.667155425)):
            Rectangle(SKETCH68_W, SKETCH68_H)
    extrude(amount=-BOSS_EXTRUDE28_DEPTH)

    # Sketch70 → Boss-Extrude29 (add)
    with BuildSketch(Plane(origin=(0, 0, 0), x_dir=(-1, 0, 0), z_dir=(0, 0, -1))):
        with Locations((40.284457478, -6.312435153)):
            Rectangle(SKETCH70_W, SKETCH70_H)
    extrude(amount=-BOSS_EXTRUDE29_DEPTH)

    # Sketch72 → Cut-Extrude44 (cut)
    with BuildSketch(Plane(origin=(0, 0, 0), x_dir=(-1, 0, 0), z_dir=(0, 0, -1))):
        with Locations((50.314457478, -5.667155425)):
            Rectangle(SKETCH72_W, SKETCH72_H)
    extrude(amount=-CUT_EXTRUDE44_DEPTH, mode=Mode.SUBTRACT)

    # Sketch75 → Cut-Extrude45 (cut)
    with BuildSketch(Plane(origin=(0, 0, 0), x_dir=(-1, 0, 0), z_dir=(0, 0, -1))):
        with Locations((57.844457478, -5.667155425)):
            Rectangle(SKETCH75_W, SKETCH75_H)
    extrude(amount=-CUT_EXTRUDE45_DEPTH, mode=Mode.SUBTRACT)

    # Sketch76 → Cut-Extrude46 (cut)
    with BuildSketch(Plane(origin=(0, 0, 16.5), x_dir=(-1, 0, 0), z_dir=(0, 0, -1))):
        with Locations((50.344457478, 24.482844575)):
            Circle(SKETCH76_R)
        with Locations((57.344457478, -35.667155425)):
            Circle(SKETCH76_R)
    extrude(amount=-CUT_EXTRUDE46_DEPTH, mode=Mode.SUBTRACT)

    # Mirror15: part across plane


with BuildPart() as part_2:
    with SkipClean():  # the faces are left unmerged after this step: merging them gives an invalid solid
        add(part_1.part)
        add(part_1.part.mirror(Plane(origin=(-57.344457478, -40.667155425, 33.5), x_dir=(0, 0, 1), z_dir=(1, 0, 0))))

    # Sketch77 → Cut-Extrude48 (cut, two sides: drawn at the far end of the back side and taken through both)
    with SkipClean():  # the faces are left unmerged after this step: merging them gives an invalid solid
        with BuildSketch(Plane(origin=(0, 0, 16.5), x_dir=(-1, 0, 0), z_dir=(0, 0, -1)).offset(-CUT_EXTRUDE48_DEPTH_BACK)):
            with Locations((79.344457478, 24.482844575)):
                Circle(SKETCH77_R)
            with Locations((93.344457478, 24.482844575)):
                Circle(SKETCH77_R)
            with Locations((93.18230081, -35.667155425)):
                Circle(SKETCH77_R)
        extrude(amount=CUT_EXTRUDE48_DEPTH + CUT_EXTRUDE48_DEPTH_BACK, mode=Mode.SUBTRACT)

    # Sketch78 → Boss-Extrude30 (add)
    with BuildSketch(Plane.XY.offset(18.5)):
        with Locations((-56.897725359, -5.667155425)):
            Rectangle(SKETCH78_W, SKETCH78_H)
    extrude(amount=-BOSS_EXTRUDE30_DEPTH)

    # Sketch79 → Boss-Extrude31 (add)
    with BuildSketch(Plane(origin=(0, 0, 16.5), x_dir=(-1, 0, 0), z_dir=(0, 0, -1))):
        with Locations((59.844457478, -5.667155425)):
            Rectangle(SKETCH79_W, SKETCH79_H)
    extrude(amount=BOSS_EXTRUDE31_DEPTH)

    # Sketch80 → Cut-Extrude49 (cut)
    with BuildSketch(Plane(origin=(0, 0, 0), x_dir=(-1, 0, 0), z_dir=(0, 0, -1))):
        with Locations((45.284457478, -5.667155425)):
            Rectangle(SKETCH80_W, SKETCH80_H)
        with Locations((69.404457478, -5.667155425)):
            Rectangle(SKETCH80_W, SKETCH80_H)
    extrude(amount=-CUT_EXTRUDE49_DEPTH, mode=Mode.SUBTRACT)

    # Sketch81 → Boss-Extrude33 (add)
    with BuildSketch(Plane(origin=(0, 0, 16.5), x_dir=(-1, 0, 0), z_dir=(0, 0, -1))):
        with Locations((57.344457478, -5.667155425)):
            Rectangle(SKETCH81_W, SKETCH81_H)
    extrude(amount=BOSS_EXTRUDE33_DEPTH)

    # Sketch83 → Cut-Extrude50 (cut)
    with BuildSketch(Plane(origin=(0, 0, 0), x_dir=(-1, 0, 0), z_dir=(0, 0, -1))):
        with Locations((84.904457478, 24.332844575)):
            Rectangle(SKETCH83_W, SKETCH83_H)
        with Locations((84.904457478, -35.667155425)):
            Rectangle(SKETCH83_W, SKETCH83_H)
    extrude(amount=-CUT_EXTRUDE50_DEPTH, mode=Mode.SUBTRACT)

    # Sketch84 → Cut-Extrude51 (cut)
    with BuildSketch(Plane.XY.offset(18.5)):
        with Locations((-79.344457478, -35.667155425)):
            Circle(SKETCH84_R)
    extrude(amount=-CUT_EXTRUDE51_DEPTH, mode=Mode.SUBTRACT)


solid = part_2.part
